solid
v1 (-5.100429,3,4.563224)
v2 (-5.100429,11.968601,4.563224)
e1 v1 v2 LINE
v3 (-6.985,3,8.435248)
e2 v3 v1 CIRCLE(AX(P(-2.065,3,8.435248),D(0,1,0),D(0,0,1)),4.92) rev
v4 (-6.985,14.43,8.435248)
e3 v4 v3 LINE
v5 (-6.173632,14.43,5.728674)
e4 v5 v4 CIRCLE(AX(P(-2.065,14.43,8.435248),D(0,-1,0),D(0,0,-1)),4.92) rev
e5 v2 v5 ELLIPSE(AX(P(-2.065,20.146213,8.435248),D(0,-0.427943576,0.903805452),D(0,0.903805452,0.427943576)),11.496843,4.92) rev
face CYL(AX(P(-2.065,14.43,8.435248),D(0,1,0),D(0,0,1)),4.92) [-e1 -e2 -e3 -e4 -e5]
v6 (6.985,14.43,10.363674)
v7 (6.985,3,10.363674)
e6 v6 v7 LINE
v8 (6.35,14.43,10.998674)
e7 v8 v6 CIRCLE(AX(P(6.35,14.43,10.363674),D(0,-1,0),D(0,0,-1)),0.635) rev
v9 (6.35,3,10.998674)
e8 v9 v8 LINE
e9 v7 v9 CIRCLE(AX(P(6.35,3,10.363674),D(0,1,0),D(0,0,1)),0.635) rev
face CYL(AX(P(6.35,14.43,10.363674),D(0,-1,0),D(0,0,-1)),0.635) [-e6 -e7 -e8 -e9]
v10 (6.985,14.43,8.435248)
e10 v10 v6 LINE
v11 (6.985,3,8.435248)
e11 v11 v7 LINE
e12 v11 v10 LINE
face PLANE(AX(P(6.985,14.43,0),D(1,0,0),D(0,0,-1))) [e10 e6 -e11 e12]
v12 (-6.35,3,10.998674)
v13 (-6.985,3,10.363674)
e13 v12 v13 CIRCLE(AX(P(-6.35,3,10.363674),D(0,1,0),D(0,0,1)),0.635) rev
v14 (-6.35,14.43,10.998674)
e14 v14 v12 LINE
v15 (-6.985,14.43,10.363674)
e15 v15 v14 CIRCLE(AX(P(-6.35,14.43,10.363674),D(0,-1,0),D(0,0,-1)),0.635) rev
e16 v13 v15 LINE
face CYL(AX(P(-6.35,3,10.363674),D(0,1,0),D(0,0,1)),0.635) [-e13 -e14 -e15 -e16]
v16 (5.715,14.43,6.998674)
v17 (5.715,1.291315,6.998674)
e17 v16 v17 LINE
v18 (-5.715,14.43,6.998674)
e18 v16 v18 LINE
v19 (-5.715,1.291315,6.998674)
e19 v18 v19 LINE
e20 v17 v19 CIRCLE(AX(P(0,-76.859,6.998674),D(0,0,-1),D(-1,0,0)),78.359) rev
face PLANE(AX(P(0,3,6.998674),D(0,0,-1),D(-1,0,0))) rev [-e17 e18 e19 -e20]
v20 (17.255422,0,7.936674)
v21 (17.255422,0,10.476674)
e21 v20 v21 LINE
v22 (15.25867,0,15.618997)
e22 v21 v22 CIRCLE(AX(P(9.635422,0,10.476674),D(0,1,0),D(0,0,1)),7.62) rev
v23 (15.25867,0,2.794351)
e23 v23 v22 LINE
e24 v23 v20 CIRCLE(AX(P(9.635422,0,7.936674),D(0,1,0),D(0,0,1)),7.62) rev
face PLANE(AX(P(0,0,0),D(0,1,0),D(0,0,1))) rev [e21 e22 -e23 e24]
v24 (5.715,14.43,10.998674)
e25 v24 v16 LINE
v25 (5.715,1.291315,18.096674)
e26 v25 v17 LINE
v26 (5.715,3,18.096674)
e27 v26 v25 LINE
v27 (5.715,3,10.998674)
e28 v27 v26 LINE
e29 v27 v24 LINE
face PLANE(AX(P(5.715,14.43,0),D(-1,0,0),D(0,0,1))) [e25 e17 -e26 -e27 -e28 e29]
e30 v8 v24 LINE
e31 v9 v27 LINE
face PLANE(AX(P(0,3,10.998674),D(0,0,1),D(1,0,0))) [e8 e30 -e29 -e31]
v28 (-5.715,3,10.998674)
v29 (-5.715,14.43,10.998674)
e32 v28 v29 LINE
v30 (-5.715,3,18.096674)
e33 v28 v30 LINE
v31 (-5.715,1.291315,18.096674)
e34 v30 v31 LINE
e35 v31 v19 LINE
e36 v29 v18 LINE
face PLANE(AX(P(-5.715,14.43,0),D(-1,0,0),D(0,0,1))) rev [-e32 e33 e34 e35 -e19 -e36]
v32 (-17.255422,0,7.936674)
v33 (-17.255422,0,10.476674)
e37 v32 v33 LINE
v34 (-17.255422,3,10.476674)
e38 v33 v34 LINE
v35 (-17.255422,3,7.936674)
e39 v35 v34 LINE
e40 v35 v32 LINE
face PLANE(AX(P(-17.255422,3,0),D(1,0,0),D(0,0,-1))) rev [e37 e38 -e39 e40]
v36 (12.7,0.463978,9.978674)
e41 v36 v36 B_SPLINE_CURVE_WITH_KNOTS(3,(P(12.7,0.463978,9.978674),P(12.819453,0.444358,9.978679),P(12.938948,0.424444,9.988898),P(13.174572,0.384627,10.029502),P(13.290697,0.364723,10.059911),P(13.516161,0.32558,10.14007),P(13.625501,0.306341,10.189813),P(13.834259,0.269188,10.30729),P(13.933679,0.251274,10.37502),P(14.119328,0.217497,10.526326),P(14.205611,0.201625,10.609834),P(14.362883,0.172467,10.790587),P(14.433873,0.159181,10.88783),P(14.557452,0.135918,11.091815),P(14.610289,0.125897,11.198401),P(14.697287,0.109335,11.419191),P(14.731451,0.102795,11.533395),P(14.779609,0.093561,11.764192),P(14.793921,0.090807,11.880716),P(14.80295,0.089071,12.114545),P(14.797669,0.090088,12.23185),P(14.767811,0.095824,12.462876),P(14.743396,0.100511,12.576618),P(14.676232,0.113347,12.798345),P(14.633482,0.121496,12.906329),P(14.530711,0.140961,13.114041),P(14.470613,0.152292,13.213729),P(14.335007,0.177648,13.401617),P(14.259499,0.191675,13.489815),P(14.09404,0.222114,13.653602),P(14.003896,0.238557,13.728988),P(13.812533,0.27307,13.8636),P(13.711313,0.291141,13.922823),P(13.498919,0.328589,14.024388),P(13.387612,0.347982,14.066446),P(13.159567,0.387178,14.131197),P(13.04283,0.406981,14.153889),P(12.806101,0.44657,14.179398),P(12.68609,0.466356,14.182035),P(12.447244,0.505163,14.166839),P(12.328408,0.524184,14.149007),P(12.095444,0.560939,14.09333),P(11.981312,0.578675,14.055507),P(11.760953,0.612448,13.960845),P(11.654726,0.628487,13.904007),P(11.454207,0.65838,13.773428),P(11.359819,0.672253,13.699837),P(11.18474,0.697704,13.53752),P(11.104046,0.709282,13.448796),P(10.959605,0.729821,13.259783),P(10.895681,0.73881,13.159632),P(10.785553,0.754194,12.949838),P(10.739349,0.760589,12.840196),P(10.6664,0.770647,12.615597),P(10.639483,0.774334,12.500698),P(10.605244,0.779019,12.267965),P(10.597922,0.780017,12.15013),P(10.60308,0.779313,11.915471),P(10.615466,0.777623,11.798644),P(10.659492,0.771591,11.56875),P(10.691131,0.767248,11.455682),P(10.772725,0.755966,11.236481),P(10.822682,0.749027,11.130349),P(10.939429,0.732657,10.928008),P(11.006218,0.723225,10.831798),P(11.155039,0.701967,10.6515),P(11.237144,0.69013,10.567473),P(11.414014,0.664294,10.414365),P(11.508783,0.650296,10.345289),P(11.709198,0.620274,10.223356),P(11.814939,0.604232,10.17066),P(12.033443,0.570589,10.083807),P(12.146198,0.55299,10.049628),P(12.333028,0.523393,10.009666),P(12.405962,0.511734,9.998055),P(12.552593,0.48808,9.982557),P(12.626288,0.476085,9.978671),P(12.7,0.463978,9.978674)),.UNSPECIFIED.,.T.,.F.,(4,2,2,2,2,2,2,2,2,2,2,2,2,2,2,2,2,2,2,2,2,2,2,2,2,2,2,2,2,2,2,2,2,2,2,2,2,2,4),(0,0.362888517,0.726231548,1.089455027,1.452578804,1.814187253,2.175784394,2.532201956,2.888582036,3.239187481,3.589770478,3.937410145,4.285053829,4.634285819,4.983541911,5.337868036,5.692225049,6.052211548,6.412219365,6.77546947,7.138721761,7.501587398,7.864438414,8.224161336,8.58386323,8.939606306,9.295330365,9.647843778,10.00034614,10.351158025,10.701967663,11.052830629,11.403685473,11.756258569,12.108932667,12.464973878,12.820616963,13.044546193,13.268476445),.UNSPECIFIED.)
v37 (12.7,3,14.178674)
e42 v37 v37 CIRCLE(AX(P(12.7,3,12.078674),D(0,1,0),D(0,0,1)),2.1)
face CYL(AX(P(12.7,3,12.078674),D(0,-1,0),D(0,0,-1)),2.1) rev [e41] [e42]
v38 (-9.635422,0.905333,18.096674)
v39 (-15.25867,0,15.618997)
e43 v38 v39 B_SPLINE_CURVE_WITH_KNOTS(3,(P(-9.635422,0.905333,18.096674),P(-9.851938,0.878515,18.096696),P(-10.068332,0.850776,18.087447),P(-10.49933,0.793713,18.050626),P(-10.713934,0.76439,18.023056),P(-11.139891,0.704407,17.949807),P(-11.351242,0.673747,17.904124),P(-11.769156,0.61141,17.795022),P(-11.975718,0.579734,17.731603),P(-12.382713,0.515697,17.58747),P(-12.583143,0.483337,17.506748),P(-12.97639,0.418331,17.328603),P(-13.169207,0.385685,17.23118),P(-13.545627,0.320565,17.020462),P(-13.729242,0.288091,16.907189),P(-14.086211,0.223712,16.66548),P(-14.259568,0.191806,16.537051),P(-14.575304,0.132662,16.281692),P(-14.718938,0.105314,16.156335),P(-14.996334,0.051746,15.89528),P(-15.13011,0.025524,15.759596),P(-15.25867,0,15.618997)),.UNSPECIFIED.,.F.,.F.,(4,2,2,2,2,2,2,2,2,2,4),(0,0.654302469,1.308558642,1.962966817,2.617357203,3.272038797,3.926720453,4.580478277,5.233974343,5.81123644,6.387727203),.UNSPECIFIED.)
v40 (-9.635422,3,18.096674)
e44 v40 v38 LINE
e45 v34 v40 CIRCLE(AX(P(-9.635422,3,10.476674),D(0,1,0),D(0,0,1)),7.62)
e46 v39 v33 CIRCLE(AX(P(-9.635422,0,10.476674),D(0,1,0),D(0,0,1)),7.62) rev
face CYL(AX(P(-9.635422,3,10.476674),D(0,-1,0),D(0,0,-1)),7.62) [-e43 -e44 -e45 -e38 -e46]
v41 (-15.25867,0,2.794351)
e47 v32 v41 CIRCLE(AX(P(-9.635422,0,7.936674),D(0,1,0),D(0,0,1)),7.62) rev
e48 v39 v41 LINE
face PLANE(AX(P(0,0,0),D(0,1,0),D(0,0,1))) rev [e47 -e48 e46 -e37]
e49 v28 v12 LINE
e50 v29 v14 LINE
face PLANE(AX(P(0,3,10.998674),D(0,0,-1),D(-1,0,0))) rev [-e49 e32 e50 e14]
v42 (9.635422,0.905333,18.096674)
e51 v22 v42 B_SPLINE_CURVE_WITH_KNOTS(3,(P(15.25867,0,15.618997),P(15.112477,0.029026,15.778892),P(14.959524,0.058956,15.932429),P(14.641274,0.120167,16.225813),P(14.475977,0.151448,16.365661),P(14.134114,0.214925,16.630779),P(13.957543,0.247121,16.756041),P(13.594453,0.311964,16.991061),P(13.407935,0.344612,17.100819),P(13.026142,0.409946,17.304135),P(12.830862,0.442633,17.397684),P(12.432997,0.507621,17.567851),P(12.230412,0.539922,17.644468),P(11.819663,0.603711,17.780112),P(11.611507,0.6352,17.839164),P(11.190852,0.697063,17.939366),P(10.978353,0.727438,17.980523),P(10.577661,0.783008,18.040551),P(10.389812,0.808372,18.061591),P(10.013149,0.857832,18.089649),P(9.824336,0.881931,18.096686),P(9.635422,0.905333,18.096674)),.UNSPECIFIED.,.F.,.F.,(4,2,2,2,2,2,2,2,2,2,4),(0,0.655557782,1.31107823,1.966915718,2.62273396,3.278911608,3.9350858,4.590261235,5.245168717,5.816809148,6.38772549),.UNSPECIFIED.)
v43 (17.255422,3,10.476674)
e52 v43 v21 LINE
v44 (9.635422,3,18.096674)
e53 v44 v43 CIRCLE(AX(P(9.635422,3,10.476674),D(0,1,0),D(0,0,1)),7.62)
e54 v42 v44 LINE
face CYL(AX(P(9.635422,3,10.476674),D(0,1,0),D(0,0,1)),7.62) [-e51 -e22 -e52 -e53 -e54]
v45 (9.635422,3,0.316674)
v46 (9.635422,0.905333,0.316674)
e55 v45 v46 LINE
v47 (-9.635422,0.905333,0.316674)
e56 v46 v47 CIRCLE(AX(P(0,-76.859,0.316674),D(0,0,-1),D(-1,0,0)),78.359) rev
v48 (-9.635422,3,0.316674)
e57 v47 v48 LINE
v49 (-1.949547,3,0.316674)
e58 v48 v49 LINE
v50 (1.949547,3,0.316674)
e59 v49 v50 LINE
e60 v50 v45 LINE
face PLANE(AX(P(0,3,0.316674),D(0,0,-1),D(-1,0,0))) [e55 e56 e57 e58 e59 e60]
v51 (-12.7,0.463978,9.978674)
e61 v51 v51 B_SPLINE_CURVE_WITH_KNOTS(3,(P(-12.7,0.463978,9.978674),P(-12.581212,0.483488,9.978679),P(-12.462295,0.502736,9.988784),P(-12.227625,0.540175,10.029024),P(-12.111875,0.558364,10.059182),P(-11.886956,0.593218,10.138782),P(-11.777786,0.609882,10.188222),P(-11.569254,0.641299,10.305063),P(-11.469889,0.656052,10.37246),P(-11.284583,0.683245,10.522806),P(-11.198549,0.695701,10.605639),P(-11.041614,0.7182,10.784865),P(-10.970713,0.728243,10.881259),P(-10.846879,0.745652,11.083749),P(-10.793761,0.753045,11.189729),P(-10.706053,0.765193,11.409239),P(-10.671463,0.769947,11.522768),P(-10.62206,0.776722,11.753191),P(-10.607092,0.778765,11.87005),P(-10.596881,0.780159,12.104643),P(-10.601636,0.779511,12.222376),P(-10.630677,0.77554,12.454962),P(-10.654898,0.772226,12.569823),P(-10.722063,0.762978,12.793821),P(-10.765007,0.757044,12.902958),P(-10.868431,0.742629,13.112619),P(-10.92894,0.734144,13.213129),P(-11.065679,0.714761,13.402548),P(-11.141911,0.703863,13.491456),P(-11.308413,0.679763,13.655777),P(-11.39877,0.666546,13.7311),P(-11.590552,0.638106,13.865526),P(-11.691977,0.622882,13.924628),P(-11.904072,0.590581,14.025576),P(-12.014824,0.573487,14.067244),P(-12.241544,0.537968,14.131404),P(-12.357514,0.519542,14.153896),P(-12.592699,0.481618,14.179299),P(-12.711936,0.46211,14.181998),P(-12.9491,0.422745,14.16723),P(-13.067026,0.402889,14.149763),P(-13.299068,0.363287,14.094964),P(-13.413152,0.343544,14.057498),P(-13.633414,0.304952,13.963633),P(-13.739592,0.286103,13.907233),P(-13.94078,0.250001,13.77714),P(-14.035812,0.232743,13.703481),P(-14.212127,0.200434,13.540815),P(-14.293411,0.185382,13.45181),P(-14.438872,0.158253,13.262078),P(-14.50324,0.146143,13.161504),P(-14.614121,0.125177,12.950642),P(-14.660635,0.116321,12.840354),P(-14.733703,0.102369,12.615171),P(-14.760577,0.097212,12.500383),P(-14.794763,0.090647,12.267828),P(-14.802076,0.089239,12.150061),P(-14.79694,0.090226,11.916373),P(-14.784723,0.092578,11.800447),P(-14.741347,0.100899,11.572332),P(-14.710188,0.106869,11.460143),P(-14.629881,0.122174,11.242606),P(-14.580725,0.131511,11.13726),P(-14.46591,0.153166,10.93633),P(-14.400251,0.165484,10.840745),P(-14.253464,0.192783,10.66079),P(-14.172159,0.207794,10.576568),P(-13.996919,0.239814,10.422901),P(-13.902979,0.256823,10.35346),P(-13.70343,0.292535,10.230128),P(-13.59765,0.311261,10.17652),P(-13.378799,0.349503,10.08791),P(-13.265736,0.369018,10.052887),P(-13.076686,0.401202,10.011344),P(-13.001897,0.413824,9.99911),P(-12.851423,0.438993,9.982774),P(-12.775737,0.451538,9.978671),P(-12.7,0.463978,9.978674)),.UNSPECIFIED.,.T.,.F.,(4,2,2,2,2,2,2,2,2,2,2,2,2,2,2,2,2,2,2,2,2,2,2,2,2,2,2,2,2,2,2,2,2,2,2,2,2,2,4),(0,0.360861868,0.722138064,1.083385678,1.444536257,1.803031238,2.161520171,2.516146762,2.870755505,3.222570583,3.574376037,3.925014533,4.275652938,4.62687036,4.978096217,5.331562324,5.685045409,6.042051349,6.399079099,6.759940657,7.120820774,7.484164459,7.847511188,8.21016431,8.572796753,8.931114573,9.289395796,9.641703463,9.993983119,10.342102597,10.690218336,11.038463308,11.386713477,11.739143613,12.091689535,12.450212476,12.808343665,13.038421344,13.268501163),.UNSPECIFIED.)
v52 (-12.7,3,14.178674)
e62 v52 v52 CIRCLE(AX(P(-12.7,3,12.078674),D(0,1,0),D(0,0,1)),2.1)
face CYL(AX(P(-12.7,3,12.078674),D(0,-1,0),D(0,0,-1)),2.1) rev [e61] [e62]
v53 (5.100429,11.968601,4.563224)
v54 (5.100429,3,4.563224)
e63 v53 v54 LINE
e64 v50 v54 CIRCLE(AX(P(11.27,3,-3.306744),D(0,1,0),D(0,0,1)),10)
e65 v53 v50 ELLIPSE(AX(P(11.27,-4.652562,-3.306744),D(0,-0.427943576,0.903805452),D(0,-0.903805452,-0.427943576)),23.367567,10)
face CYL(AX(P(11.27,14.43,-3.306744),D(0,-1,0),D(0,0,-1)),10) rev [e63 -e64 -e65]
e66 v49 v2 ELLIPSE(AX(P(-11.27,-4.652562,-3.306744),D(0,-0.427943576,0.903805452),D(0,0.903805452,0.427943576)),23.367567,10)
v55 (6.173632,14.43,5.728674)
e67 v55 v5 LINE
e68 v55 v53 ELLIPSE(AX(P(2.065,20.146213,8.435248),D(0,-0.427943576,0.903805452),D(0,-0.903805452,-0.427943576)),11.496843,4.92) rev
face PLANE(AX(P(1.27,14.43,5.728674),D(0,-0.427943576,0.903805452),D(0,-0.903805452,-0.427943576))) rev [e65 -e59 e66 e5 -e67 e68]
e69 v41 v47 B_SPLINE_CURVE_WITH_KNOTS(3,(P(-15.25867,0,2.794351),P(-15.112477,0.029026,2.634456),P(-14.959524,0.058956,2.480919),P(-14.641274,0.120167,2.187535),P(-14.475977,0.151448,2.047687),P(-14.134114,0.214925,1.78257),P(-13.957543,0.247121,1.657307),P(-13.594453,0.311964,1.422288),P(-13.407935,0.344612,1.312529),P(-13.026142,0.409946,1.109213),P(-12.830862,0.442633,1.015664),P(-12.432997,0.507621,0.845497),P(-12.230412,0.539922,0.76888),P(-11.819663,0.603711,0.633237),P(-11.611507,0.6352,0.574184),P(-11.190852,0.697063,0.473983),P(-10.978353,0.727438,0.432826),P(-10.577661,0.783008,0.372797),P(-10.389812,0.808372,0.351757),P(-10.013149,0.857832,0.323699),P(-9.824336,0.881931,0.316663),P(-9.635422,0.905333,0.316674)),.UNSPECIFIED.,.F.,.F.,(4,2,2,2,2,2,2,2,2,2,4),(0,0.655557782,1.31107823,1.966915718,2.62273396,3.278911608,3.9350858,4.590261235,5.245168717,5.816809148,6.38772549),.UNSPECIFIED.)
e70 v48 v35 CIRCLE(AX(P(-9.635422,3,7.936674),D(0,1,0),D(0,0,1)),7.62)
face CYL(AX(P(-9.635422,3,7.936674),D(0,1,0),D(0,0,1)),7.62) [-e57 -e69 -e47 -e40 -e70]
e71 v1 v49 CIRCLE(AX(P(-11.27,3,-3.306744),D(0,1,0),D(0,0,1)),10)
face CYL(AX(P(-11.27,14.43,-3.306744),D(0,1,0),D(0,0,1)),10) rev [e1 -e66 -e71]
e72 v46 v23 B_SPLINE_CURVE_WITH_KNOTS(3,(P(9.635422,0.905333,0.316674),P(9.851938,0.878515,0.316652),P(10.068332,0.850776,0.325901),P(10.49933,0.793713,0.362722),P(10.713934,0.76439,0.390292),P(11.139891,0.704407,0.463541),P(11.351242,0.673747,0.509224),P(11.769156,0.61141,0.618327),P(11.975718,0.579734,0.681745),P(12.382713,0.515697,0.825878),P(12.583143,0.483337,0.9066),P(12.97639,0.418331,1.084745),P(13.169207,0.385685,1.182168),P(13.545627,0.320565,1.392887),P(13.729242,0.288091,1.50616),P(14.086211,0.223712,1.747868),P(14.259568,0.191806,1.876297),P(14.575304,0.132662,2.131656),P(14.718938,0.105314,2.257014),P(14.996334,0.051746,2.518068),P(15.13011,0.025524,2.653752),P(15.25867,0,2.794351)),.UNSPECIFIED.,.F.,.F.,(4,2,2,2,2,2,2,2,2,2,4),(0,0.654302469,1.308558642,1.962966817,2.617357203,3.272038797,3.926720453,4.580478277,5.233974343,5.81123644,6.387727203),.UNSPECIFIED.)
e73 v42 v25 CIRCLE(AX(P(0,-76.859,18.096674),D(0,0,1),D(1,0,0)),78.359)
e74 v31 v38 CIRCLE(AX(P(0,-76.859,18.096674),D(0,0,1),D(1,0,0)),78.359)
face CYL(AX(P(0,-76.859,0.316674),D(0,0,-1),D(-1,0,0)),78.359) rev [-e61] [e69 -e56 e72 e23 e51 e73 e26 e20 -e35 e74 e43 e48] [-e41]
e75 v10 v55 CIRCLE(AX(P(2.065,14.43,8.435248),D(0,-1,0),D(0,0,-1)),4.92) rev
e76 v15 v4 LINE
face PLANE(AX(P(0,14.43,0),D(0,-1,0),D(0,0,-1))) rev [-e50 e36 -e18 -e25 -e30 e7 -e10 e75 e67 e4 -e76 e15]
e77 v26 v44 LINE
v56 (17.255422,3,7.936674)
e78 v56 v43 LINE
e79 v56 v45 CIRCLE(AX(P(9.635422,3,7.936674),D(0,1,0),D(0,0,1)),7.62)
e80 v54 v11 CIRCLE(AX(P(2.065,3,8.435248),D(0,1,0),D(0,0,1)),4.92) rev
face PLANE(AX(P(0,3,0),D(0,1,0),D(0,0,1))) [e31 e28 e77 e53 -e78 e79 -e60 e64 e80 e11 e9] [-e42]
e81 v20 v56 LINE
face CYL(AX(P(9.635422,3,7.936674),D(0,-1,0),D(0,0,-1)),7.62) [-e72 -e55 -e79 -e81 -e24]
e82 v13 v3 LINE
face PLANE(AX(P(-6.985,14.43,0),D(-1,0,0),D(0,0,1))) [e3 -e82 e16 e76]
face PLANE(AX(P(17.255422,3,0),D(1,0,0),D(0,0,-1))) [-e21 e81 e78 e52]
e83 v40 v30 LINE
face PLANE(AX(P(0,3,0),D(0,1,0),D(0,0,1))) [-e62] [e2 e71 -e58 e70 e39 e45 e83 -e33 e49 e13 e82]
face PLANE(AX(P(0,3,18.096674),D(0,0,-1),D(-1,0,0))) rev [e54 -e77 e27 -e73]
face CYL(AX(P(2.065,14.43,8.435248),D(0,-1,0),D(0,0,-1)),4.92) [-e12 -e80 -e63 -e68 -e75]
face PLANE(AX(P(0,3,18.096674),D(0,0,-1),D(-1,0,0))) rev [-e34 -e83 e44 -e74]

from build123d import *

# Parameters (mm, degrees)
SKETCH1_R               = 2.1
SKETCH1_W               = 1.815
SKETCH1_H               = 1
SKETCH1_H_2             = 3
BOSS_EXTRUDE1_DEPTH     = 3
BOSS_EXTRUDE2_START     = 3
SKETCH1_8_W             = 1.815
SKETCH1_8_H             = 1
BOSS_EXTRUDE2_DEPTH     = 11.43
CUT_EXTRUDE2_DEPTH      = 29.869778286
CUT_EXTRUDE2_DEPTH_BACK = 29.869778286
SKETCH2_R               = 78.359
CHAMFER1_SIZE           = 2.54
BOSS_EXTRUDE3_DEPTH     = 1.27
FILLET1_R               = 7.62
FILLET5_R               = 10
FILLET6_R               = 4.92
SKETCH7_W               = 11.43
SKETCH7_H               = 5.433942037
CUT_EXTRUDE4_DEPTH      = 29.869778458
FILLET7_R               = 0.635


with BuildPart() as part:
    # Sketch1 → Boss-Extrude1 (new body)
    # profile 1 of 6: a face of its own
    with BuildSketch(Plane(origin=(0, 0, 0), x_dir=(1, 0, 0), z_dir=(0, 1, 0))):
        Polygon((6.985, -10.998674064), (5.715, -10.998674064), (5.715, -15.888674064), (5.715, -18.096674099), (17.255421897, -18.096674099), (17.255421897, -0.316674099), (-17.255421897, -0.316674099), (-17.255421897, -18.096674099), (-5.715, -18.096674099), (-5.715, -15.888674064), (-5.715, -10.998674064), (-6.985, -10.998674064), (-6.985, -5.728674064), (6.985, -5.728674064), align=None)
        with Locations(Location((-12.7, -12.078674064, 0), (0, 0, 270))):
            Circle(SKETCH1_R, mode=Mode.SUBTRACT)
        with Locations(Location((12.7, -12.078674064, 0), (0, 0, 270))):
            Circle(SKETCH1_R, mode=Mode.SUBTRACT)
    # profile 2 of 6: a face of its own
    with BuildSketch(Plane(origin=(0, 0, 0), x_dir=(1, 0, 0), z_dir=(0, 1, 0))):
        Polygon((5.715, -9.998674064), (5.715, -10.998674064), (6.985, -10.998674064), (6.985, -5.728674064), (-6.985, -5.728674064), (-6.985, -10.998674064), (-5.715, -10.998674064), (-5.715, -9.998674064), (-5.715, -6.998674064), (-3.9, -6.998674064), (3.9, -6.998674064), (5.715, -6.998674064), align=None)
    # profile 3 of 6: a face of its own
    with BuildSketch(Plane(origin=(0, 0, 0), x_dir=(1, 0, 0), z_dir=(0, 1, 0))):
        with Locations((-4.8075, -10.498674064)):
            Rectangle(SKETCH1_W, SKETCH1_H)
    # profile 4 of 6: a face of its own
    with BuildSketch(Plane(origin=(0, 0, 0), x_dir=(1, 0, 0), z_dir=(0, 1, 0))):
        with Locations((-4.8075, -8.498674064)):
            Rectangle(SKETCH1_W, SKETCH1_H_2)
    # profile 5 of 6: a face of its own
    with BuildSketch(Plane(origin=(0, 0, 0), x_dir=(1, 0, 0), z_dir=(0, 1, 0))):
        with Locations((4.8075, -8.498674064)):
            Rectangle(SKETCH1_W, SKETCH1_H_2)
    # profile 6 of 6: a face of its own
    with BuildSketch(Plane(origin=(0, 0, 0), x_dir=(1, 0, 0), z_dir=(0, 1, 0))):
        with Locations((4.8075, -10.498674064)):
            Rectangle(SKETCH1_W, SKETCH1_H)
    extrude(amount=BOSS_EXTRUDE1_DEPTH)

    # Sketch1<8> → Boss-Extrude2 (add)
    with BuildSketch(Plane(origin=(0, 0, 0), x_dir=(1, 0, 0), z_dir=(0, 1, 0)).offset(BOSS_EXTRUDE2_START)):
        Polygon((5.715, -9.998674064), (5.715, -10.998674064), (6.985, -10.998674064), (6.985, -5.728674064), (-6.985, -5.728674064), (-6.985, -10.998674064), (-5.715, -10.998674064), (-5.715, -9.998674064), (-5.715, -6.998674064), (-3.9, -6.998674064), (3.9, -6.998674064), (5.715, -6.998674064), align=None)
        with Locations((4.8075, -10.498674064)):
            Rectangle(SKETCH1_8_W, SKETCH1_8_H)
        with Locations((-4.8075, -10.498674064)):
            Rectangle(SKETCH1_8_W, SKETCH1_8_H)
    extrude(amount=BOSS_EXTRUDE2_DEPTH)

    # Sketch2 → Cut-Extrude2 (cut, two sides: drawn at the far end of the back side and taken through both)
    with BuildSketch(Plane.XY.offset(-CUT_EXTRUDE2_DEPTH_BACK)):
        with Locations((0, -76.858999952)):
            Circle(SKETCH2_R)
    extrude(amount=CUT_EXTRUDE2_DEPTH + CUT_EXTRUDE2_DEPTH_BACK, mode=Mode.SUBTRACT)

    # Chamfer1
    # the kernel refuses this chamfer: 2.54 mm, written as the material it adds along each edge
    with BuildSketch(Plane(origin=(5.715, 3, 6.998674064), x_dir=(0.027495876610586268, 0.9996219169112968, 0), z_dir=(0, 0, 1))) as chamfer1_piece_1_section:
        Polygon((CHAMFER1_SIZE * 0.999621916911, CHAMFER1_SIZE * 0.0274958766106), (-CHAMFER1_SIZE * 0.0274958766106, CHAMFER1_SIZE * 0.999621916911), (0, 0), align=None)
    chamfer1_piece_1 = extrude(amount=3, mode=Mode.PRIVATE)
    chamfer1_piece_1 = split(chamfer1_piece_1, bisect_by=Plane(origin=(3.9, 3.90032925, 8.498674064), z_dir=(1, 0, 0)), keep=Keep.TOP, mode=Mode.PRIVATE)
    add(chamfer1_piece_1)
    with BuildSketch(Plane(origin=(-5.715, 3, 9.998674064), x_dir=(-0.027495876610586268, 0.9996219169112968, 0), z_dir=(0, 0, -1))) as chamfer1_piece_2_section:
        Polygon((CHAMFER1_SIZE * 0.999621916911, CHAMFER1_SIZE * 0.0274958766106), (-CHAMFER1_SIZE * 0.0274958766106, CHAMFER1_SIZE * 0.999621916911), (0, 0), align=None)
    chamfer1_piece_2 = extrude(amount=3, mode=Mode.PRIVATE)
    chamfer1_piece_2 = split(chamfer1_piece_2, bisect_by=Plane(origin=(-3.9, 3.90032925, 8.498674064), z_dir=(-1, 0, 0)), keep=Keep.TOP, mode=Mode.PRIVATE)
    add(chamfer1_piece_2)

    # Sketch6 → Boss-Extrude3 (add, symmetric)
    with BuildSketch(Plane(origin=(0, 0, 0), x_dir=(0, 0, -1), z_dir=(1, 0, 0))):
        Polygon((-5.728674064, 14.43), (-0.316674099, 3), (-5.728674064, 3), align=None)
    extrude(amount=BOSS_EXTRUDE3_DEPTH, both=True)

    # Fillet1
    fillet1_edges = [part.edges().sort_by_distance(p)[0] for p in [
        (-17.255421897, 1.5, 0.316674099),
        (17.255421897, 1.5, 0.316674099),
        (17.255421897, 1.5, 18.096674099),
        (-17.255421897, 1.5, 18.096674099),
    ]]
    fillet(fillet1_edges, radius=FILLET1_R)

    # Fillet5
    # the kernel refuses this fillet: 10 mm, written as the material it adds along each edge
    with BuildSketch(Plane(origin=(-1.27, 3, 5.728674064), x_dir=(-1, 0, 0), z_dir=(0, 1, 0))) as fillet5_piece_1_section:
        with BuildLine():
            CenterArc((10, -9.03541781), FILLET5_R, 115.372403981, 64.627596019)
            Line((0, -9.03541781), (0, 0))
            Line((0, 0), (5.715, 0))
        make_face()
    fillet5_piece_1 = extrude(amount=34.018544525, mode=Mode.PRIVATE)
    fillet5_piece_1 = split(fillet5_piece_1, bisect_by=Plane(origin=(-3.934188125, 8.906839934, 3.113508527), z_dir=(0, -0.42794357624145657, 0.9038054522703837)), keep=Keep.TOP, mode=Mode.PRIVATE)
    add(fillet5_piece_1)
    with BuildSketch(Plane(origin=(1.27, 3, 5.728674064), x_dir=(1, 0, 0), z_dir=(0, 1, 0))) as fillet5_piece_2_section:
        with BuildLine():
            CenterArc((10, 9.03541781), FILLET5_R, 180, 64.627596019)
            Line((0, 9.03541781), (0, 0))
            Line((0, 0), (5.715, 0))
        make_face()
    fillet5_piece_2 = extrude(amount=34.018544525, mode=Mode.PRIVATE)
    fillet5_piece_2 = split(fillet5_piece_2, bisect_by=Plane(origin=(3.934188125, 8.906839934, 3.113508527), z_dir=(0, -0.42794357624145657, 0.9038054522703837)), keep=Keep.TOP, mode=Mode.PRIVATE)
    add(fillet5_piece_2)

    # Fillet6
    fillet6_edges = [part.edges().sort_by_distance(p)[0] for p in [
        (6.985, 8.715, 5.728674064),
        (-6.985, 8.715, 5.728674064),
    ]]
    fillet(fillet6_edges, radius=FILLET6_R)

    # Sketch7 → Cut-Extrude4 (cut, through all)
    with BuildSketch(Plane(origin=(0, 14.43, 0), x_dir=(1, 0, 0), z_dir=(0, 1, 0))):
        with Locations((0, -9.715645083)):
            Rectangle(SKETCH7_W, SKETCH7_H)
    extrude(amount=-CUT_EXTRUDE4_DEPTH, mode=Mode.SUBTRACT)

    # Fillet7
    fillet7_edges = [part.edges().sort_by_distance(p)[0] for p in [
        (6.985, 8.715, 10.998674064),
        (-6.985, 8.715, 10.998674064),
    ]]
    fillet(fillet7_edges, radius=FILLET7_R)


solid = part.part
